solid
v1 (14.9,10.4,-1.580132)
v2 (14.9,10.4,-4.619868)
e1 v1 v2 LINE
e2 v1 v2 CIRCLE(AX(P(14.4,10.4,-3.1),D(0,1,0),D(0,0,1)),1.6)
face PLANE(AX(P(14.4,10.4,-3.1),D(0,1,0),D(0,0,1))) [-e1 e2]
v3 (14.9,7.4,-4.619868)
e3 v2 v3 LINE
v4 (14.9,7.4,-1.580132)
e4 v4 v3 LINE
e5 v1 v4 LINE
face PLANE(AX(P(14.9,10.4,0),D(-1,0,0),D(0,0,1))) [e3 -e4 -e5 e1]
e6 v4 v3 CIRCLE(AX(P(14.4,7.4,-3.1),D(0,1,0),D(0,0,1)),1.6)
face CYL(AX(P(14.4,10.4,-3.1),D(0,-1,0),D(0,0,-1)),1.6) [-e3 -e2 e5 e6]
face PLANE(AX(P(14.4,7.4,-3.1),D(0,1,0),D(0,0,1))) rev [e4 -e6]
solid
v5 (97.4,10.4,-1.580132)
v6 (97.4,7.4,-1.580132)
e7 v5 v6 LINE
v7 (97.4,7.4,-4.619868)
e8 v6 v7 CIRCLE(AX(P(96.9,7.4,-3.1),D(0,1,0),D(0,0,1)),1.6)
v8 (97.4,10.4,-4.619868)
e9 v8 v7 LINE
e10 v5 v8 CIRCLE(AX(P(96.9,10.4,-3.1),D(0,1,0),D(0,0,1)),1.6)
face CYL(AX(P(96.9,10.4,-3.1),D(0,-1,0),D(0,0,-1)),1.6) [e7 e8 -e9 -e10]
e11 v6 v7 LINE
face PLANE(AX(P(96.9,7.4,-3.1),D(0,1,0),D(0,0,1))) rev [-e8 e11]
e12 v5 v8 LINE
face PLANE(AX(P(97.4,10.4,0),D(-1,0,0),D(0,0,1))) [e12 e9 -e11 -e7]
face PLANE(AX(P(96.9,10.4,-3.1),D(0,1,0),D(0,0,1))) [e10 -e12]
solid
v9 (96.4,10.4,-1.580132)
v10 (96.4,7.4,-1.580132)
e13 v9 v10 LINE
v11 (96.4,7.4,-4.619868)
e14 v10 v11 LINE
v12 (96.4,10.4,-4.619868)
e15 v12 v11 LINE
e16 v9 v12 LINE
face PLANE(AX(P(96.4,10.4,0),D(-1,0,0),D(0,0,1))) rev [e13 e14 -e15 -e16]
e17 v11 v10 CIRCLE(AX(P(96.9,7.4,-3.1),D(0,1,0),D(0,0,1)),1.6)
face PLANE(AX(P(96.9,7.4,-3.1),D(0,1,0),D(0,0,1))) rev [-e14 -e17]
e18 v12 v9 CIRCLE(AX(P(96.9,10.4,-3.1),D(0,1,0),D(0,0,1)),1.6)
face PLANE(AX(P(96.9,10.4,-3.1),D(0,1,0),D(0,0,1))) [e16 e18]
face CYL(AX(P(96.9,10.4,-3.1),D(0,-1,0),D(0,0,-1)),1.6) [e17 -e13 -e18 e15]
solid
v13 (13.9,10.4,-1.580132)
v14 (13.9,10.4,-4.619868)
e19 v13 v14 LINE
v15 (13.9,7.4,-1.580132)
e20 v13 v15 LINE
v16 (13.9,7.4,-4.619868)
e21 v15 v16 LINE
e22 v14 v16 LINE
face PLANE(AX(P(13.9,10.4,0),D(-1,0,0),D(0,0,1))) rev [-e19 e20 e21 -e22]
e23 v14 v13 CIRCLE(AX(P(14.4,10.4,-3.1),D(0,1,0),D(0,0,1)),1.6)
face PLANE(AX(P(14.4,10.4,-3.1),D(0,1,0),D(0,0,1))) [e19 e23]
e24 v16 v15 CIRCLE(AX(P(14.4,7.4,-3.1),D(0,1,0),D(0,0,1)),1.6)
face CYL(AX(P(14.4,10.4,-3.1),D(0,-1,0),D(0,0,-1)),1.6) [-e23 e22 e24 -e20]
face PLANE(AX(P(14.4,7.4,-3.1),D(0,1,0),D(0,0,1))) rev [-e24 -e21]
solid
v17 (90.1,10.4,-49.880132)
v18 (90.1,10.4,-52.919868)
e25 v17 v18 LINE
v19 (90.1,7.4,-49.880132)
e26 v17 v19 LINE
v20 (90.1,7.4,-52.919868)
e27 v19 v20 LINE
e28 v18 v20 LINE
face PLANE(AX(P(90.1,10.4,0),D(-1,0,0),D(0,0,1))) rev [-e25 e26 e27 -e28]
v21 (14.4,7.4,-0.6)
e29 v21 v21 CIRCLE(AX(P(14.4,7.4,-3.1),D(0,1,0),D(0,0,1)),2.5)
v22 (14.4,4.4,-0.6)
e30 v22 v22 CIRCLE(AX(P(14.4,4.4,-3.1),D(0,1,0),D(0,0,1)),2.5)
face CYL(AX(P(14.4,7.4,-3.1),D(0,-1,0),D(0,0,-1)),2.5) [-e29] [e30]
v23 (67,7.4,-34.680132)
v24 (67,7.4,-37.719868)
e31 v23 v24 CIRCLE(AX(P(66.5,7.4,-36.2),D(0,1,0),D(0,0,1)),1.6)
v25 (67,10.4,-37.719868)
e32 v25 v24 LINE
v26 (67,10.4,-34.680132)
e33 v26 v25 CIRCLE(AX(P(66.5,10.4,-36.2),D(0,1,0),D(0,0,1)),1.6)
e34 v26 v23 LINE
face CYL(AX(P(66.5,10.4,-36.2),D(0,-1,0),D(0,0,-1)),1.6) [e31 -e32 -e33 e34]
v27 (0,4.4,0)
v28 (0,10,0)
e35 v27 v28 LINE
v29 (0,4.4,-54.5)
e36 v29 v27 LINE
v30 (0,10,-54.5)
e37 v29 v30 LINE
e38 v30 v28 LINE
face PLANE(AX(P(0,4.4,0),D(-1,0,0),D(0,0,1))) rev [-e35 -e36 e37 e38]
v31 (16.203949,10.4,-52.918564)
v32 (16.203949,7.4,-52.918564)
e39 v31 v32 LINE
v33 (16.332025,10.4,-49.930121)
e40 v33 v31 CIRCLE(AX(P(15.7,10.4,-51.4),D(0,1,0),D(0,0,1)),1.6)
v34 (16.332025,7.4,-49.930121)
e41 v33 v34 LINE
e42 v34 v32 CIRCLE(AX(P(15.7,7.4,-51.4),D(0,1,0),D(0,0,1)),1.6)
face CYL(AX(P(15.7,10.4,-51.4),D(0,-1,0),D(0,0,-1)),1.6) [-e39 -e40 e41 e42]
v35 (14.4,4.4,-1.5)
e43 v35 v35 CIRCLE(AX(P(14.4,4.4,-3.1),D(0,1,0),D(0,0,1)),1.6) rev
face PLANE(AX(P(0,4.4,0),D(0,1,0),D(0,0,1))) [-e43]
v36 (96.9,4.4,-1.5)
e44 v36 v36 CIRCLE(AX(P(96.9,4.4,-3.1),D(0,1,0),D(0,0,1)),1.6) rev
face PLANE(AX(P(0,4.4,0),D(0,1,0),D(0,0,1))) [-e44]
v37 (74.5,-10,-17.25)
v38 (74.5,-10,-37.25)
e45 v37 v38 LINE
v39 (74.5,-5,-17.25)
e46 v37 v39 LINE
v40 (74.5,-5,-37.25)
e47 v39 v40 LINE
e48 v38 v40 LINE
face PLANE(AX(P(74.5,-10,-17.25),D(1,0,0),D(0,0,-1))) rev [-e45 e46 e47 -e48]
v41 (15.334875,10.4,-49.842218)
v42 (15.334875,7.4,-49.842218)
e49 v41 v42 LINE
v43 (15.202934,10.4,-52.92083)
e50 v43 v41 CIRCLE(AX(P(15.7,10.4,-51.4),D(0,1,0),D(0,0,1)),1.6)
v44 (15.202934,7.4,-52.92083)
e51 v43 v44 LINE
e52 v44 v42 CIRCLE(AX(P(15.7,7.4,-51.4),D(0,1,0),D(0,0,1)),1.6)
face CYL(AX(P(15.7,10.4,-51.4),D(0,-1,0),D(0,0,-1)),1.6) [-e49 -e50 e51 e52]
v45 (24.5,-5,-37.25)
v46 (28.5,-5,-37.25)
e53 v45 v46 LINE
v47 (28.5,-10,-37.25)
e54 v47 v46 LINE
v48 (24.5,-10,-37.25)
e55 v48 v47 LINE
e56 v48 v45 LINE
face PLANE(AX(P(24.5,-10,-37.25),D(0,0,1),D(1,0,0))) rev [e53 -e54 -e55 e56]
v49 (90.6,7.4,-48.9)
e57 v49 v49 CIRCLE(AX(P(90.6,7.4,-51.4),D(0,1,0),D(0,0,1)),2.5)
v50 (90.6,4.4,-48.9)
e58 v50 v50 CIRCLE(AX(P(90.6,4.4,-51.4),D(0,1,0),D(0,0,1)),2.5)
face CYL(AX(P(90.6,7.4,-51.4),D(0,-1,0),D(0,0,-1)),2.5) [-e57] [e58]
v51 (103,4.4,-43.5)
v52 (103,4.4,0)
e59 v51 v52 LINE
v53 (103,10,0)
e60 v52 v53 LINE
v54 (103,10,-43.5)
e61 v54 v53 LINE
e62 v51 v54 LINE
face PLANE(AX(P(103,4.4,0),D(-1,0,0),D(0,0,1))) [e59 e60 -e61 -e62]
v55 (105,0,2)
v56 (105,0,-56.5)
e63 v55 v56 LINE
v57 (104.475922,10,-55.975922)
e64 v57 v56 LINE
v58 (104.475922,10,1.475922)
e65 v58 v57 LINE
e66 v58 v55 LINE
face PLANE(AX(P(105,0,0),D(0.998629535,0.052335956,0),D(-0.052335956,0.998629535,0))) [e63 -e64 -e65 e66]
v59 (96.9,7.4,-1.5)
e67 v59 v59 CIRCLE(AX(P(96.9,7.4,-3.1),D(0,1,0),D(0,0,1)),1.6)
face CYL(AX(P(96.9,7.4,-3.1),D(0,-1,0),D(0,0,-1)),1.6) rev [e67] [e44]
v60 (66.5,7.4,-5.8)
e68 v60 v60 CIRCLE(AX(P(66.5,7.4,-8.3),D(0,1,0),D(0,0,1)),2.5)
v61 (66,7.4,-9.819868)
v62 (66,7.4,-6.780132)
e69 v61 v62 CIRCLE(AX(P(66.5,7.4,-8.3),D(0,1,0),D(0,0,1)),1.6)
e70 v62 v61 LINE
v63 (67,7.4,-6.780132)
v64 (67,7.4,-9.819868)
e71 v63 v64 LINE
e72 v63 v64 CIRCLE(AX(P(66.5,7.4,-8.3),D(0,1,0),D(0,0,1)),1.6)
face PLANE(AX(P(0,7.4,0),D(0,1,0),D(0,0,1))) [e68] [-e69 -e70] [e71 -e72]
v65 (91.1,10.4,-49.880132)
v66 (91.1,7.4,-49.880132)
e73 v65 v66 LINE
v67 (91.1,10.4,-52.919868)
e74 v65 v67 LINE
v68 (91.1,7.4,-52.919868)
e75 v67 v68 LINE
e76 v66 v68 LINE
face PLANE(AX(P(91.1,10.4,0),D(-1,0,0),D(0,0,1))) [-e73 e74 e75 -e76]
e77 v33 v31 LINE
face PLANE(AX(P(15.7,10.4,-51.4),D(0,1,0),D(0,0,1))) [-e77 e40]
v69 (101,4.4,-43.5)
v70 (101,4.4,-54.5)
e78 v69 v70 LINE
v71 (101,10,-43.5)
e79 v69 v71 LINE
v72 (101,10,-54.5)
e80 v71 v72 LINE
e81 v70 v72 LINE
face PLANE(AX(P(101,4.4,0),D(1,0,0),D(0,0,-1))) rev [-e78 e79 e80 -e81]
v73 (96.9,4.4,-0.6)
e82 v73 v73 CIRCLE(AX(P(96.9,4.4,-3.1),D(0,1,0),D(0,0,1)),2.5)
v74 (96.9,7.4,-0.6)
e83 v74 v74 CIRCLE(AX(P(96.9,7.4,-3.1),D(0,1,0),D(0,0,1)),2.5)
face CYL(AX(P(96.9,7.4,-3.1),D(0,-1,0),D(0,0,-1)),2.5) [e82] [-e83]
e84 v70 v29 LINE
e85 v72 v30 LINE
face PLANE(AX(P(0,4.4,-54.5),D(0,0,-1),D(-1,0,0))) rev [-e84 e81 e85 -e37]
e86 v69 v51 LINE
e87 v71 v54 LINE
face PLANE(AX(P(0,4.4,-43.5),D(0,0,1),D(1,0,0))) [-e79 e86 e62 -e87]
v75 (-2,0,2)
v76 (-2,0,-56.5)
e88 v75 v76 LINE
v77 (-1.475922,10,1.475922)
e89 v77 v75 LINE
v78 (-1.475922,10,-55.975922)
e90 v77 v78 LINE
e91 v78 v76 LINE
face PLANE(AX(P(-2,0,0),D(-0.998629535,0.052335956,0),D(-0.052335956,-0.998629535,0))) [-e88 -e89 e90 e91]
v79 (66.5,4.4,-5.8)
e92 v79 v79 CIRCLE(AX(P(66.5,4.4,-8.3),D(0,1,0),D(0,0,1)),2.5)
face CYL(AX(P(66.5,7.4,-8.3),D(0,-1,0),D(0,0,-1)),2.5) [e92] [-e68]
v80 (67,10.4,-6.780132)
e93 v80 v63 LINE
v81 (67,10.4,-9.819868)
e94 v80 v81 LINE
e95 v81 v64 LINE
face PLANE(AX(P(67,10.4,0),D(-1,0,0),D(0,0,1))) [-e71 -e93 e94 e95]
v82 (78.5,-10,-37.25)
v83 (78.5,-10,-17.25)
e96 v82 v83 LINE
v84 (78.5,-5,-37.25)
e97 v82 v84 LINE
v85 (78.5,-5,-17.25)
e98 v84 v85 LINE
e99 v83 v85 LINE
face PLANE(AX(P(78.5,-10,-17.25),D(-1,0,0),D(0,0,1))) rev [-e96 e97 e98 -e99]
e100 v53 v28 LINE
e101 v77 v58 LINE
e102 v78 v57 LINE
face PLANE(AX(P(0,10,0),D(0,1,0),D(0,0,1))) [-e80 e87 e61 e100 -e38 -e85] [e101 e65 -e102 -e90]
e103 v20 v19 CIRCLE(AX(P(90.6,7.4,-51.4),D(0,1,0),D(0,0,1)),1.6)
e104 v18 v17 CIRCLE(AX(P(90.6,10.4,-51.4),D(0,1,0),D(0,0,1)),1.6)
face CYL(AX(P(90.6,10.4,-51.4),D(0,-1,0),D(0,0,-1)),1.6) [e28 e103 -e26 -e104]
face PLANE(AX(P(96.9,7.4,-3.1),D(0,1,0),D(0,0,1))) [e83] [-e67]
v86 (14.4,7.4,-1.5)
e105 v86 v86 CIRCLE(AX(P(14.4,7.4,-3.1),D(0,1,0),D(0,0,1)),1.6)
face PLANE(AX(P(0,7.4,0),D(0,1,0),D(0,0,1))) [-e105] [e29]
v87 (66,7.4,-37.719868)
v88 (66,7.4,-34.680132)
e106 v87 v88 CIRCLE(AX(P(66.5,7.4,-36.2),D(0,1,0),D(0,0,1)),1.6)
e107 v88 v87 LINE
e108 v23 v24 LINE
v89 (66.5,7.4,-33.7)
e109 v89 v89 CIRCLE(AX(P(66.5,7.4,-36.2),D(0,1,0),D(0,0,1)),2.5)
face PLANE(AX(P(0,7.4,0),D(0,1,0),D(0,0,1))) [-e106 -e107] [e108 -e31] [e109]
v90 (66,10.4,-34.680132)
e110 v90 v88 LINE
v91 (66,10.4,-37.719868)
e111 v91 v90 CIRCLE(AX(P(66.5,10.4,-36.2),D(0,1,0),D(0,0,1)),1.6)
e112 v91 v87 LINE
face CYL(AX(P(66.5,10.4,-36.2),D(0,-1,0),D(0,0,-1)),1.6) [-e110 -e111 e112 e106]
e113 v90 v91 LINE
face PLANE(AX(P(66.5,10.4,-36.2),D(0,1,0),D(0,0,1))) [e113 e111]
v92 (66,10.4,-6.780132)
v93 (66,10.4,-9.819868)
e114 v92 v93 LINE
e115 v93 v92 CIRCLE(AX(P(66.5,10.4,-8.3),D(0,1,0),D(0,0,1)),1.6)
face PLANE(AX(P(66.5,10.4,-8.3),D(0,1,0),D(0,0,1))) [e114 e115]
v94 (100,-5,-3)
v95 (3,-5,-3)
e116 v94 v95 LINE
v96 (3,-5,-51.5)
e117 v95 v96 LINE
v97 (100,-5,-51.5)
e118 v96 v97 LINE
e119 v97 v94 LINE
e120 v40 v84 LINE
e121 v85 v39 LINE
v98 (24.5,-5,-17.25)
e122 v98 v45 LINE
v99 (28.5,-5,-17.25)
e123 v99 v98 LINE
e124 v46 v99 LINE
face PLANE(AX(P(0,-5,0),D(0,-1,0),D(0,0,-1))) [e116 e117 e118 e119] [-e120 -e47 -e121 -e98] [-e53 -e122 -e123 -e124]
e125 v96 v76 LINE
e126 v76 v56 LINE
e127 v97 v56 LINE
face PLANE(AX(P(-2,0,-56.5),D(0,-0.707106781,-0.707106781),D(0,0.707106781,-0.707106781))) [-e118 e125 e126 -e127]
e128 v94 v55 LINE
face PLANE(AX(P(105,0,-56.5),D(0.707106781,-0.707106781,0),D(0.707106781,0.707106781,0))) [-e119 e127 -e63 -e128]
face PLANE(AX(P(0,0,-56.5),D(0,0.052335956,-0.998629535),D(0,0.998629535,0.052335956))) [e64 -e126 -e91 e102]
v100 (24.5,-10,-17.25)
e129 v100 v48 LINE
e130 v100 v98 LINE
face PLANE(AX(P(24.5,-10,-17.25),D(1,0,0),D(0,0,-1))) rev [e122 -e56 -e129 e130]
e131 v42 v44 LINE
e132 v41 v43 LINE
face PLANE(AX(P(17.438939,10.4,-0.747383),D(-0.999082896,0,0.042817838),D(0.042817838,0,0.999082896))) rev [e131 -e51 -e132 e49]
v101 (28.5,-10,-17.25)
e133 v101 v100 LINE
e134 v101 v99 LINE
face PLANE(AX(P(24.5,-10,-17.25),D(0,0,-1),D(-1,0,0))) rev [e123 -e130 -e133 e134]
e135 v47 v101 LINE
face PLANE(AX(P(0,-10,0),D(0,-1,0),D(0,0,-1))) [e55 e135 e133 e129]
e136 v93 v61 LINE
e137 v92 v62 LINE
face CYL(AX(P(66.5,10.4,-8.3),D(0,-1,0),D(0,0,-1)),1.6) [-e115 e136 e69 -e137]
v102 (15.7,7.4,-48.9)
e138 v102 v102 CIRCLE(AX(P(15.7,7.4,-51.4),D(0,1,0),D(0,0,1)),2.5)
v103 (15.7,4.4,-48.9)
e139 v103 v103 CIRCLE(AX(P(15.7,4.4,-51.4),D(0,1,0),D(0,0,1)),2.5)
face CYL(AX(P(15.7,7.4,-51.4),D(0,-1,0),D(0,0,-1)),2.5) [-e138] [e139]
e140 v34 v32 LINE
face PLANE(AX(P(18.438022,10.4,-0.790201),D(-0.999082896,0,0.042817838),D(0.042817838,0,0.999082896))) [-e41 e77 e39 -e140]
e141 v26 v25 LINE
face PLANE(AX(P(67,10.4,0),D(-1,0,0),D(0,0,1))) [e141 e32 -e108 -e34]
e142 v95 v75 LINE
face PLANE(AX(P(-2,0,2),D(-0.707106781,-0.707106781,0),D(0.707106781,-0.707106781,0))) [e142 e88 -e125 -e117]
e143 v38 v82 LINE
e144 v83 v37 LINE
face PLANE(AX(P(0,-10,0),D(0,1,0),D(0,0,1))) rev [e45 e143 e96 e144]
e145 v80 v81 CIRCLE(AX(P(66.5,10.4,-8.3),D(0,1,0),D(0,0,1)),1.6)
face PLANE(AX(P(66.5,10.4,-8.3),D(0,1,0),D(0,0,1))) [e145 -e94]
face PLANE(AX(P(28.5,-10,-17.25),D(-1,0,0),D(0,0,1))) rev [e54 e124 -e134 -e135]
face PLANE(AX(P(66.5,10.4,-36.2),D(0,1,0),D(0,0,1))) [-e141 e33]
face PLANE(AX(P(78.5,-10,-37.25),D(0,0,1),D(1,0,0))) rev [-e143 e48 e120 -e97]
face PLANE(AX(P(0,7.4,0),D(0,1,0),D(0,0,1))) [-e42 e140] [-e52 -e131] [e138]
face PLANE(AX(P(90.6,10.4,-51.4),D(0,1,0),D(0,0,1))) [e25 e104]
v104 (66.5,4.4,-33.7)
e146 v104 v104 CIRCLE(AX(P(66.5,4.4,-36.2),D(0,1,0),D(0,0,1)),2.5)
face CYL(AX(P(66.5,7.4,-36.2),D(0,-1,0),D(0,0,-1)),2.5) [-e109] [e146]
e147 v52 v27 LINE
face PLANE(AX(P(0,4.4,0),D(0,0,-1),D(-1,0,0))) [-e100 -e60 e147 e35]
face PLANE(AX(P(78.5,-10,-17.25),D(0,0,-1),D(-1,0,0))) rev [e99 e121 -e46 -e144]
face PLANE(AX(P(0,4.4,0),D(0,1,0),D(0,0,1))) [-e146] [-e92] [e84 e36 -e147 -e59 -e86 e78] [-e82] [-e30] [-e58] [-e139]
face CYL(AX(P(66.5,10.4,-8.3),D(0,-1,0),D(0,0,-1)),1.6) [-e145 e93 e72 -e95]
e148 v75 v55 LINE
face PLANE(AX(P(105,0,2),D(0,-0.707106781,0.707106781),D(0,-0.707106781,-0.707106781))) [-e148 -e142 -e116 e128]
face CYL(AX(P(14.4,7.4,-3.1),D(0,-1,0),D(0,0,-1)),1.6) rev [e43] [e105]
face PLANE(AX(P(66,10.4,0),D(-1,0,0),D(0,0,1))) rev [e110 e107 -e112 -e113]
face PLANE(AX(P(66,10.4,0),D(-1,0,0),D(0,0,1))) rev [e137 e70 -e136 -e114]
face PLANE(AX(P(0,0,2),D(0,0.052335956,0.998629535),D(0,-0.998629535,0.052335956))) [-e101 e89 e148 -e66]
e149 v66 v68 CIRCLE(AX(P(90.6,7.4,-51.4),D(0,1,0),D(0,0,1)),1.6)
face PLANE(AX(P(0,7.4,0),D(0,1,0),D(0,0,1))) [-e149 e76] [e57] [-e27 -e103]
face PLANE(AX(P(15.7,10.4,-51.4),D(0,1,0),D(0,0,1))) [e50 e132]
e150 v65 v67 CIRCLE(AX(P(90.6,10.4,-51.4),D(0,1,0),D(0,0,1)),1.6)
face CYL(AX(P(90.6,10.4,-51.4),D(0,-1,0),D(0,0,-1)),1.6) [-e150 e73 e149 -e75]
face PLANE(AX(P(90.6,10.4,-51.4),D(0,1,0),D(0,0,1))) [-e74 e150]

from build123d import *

# Parameters (mm, degrees)
SKETCH2_W           = 107
SKETCH2_H           = 58.5
BOSS_EXTRUDE1_DEPTH = 10
BOSS_EXTRUDE1_TAPER = 3
CUT_EXTRUDE1_START  = 10
SKETCH2_5_W         = 2
SKETCH2_5_H         = 1
CUT_EXTRUDE1_DEPTH  = 5.6
SKETCH8_W           = 107
SKETCH8_H           = 58.5
BOSS_EXTRUDE2_DEPTH = 5
BOSS_EXTRUDE2_TAPER = 45
SKETCH9_W           = 4
SKETCH9_H           = 20
BOSS_EXTRUDE3_DEPTH = 5
SKETCH10_R          = 2.5
BOSS_EXTRUDE4_DEPTH = 3
BOSS_EXTRUDE5_START = 7.4
BOSS_EXTRUDE5_DEPTH = 3


# Read off the part's stored shape, not the designer's step: Boss-Extrude5
with BuildPart() as part:
    # Sketch2 → Boss-Extrude1 (new body)
    with BuildSketch(Plane(origin=(0, 0, 0), x_dir=(1, 0, 0), z_dir=(0, 1, 0))):
        with Locations((51.5, 27.25)):
            Rectangle(SKETCH2_W, SKETCH2_H)
    extrude(amount=BOSS_EXTRUDE1_DEPTH, taper=BOSS_EXTRUDE1_TAPER)

    # Sketch2<5> → Cut-Extrude1 (cut)
    with BuildSketch(Plane(origin=(0, 0, 0), x_dir=(1, 0, 0), z_dir=(0, 1, 0)).offset(CUT_EXTRUDE1_START)):
        Polygon((0, 0), (101, 0), (101, 1), (103, 3), (103, 41.5), (101, 43.5), (101, 54.5), (0, 54.5), align=None)
        Polygon((103, 43.5), (101, 43.5), (103, 41.5), align=None)
        Polygon((103, 3), (101, 1), (103, 1), align=None)
        with Locations((102, 0.5)):
            Rectangle(SKETCH2_5_W, SKETCH2_5_H)
    extrude(amount=-CUT_EXTRUDE1_DEPTH, mode=Mode.SUBTRACT)

    # Sketch8 → Boss-Extrude2 (add)
    with BuildSketch(Plane.XZ):
        with Locations((51.5, -27.25)):
            Rectangle(SKETCH8_W, SKETCH8_H)
    extrude(amount=BOSS_EXTRUDE2_DEPTH, taper=BOSS_EXTRUDE2_TAPER)

    # Sketch9 → Boss-Extrude3 (add)
    with BuildSketch(Plane.XZ.offset(5)):
        with Locations((26.5, -27.25)):
            Rectangle(SKETCH9_W, SKETCH9_H)
        with Locations((76.5, -27.25)):
            Rectangle(SKETCH9_W, SKETCH9_H)
    extrude(amount=BOSS_EXTRUDE3_DEPTH)

    # Sketch10 → Boss-Extrude4 (add)
    # profile 1 of 6: a face of its own
    with BuildSketch(Plane(origin=(0, 4.4, 0), x_dir=(1, 0, 0), z_dir=(0, 1, 0))):
        with Locations(Location((15.7, 51.4, 0), (0, 0, 270))):
            Circle(SKETCH10_R)
    # profile 2 of 6: a face of its own
    with BuildSketch(Plane(origin=(0, 4.4, 0), x_dir=(1, 0, 0), z_dir=(0, 1, 0))):
        with Locations(Location((90.6, 51.4, 0), (0, 0, 270))):
            Circle(SKETCH10_R)
    # profile 3 of 6: a face of its own
    with BuildSketch(Plane(origin=(0, 4.4, 0), x_dir=(1, 0, 0), z_dir=(0, 1, 0))):
        with Locations(Location((66.5, 8.3, 0), (0, 0, 270))):
            Circle(SKETCH10_R)
    # profile 4 of 6: a face of its own
    with BuildSketch(Plane(origin=(0, 4.4, 0), x_dir=(1, 0, 0), z_dir=(0, 1, 0))):
        with Locations(Location((66.5, 36.2, 0), (0, 0, 270))):
            Circle(SKETCH10_R)
    # profile 5 of 6: a face of its own
    with BuildSketch(Plane(origin=(0, 4.4, 0), x_dir=(1, 0, 0), z_dir=(0, 1, 0))):
        with Locations(Location((96.9, 3.1, 0), (0, 0, 270))):
            Circle(SKETCH10_R)
        with BuildLine():
            ThreePointArc((96.4, 4.619868415), (96.9, 4.7), (97.4, 4.619868415))
            ThreePointArc((97.4, 4.619868415), (96.9, 1.5), (96.4, 4.619868415))
        make_face(mode=Mode.SUBTRACT)
    # profile 6 of 6: a face of its own
    with BuildSketch(Plane(origin=(0, 4.4, 0), x_dir=(1, 0, 0), z_dir=(0, 1, 0))):
        with Locations(Location((14.4, 3.1, 0), (0, 0, 270))):
            Circle(SKETCH10_R)
        with BuildLine():
            ThreePointArc((13.9, 1.580131585), (12.8, 3.1), (13.9, 4.619868415))
            ThreePointArc((13.9, 4.619868415), (14.4, 4.7), (14.9, 4.619868415))
            ThreePointArc((14.9, 4.619868415), (16, 3.1), (14.9, 1.580131585))
            ThreePointArc((14.9, 1.580131585), (14.4, 1.5), (13.9, 1.580131585))
        make_face(mode=Mode.SUBTRACT)
    extrude(amount=BOSS_EXTRUDE4_DEPTH)

    # Boss-Extrude5 outline → Boss-Extrude5 (add)
    with BuildSketch(Plane(origin=(0, 0, 0), x_dir=(1, 0, 0), z_dir=(0, 1, 0)).offset(BOSS_EXTRUDE5_START)):
        with BuildLine():
            ThreePointArc((96.4, 4.619868415), (95.3, 3.1), (96.4, 1.580131585))
            Line((96.4, 1.580131585), (96.4, 4.619868415))
        make_face()
        with BuildLine():
            ThreePointArc((97.4, 1.580131585), (98.5, 3.1), (97.4, 4.619868415))
            Line((97.4, 4.619868415), (97.4, 1.580131585))
        make_face()
        with BuildLine():
            ThreePointArc((13.9, 4.619868415), (12.8, 3.1), (13.9, 1.580131585))
            Line((13.9, 1.580131585), (13.9, 4.619868415))
        make_face()
        with BuildLine():
            ThreePointArc((14.9, 1.580131585), (16, 3.1), (14.9, 4.619868415))
            Line((14.9, 4.619868415), (14.9, 1.580131585))
        make_face()
        with BuildLine():
            ThreePointArc((16.332025214, 49.930121049), (17.298532633, 51.468508541), (16.203949106, 52.918563564))
            Line((16.203949106, 52.918563564), (16.332025214, 49.930121049))
        make_face()
        with BuildLine():
            ThreePointArc((15.202934006, 52.920830496), (14.101467367, 51.331491459), (15.334874522, 49.842218441))
            Line((15.334874522, 49.842218441), (15.202934006, 52.920830496))
        make_face()
        with BuildLine():
            ThreePointArc((91.1, 49.880131585), (92.2, 51.4), (91.1, 52.919868415))
            Line((91.1, 52.919868415), (91.1, 49.880131585))
        make_face()
        with BuildLine():
            ThreePointArc((90.1, 52.919868415), (89, 51.4), (90.1, 49.880131585))
            Line((90.1, 49.880131585), (90.1, 52.919868415))
        make_face()
        with BuildLine():
            ThreePointArc((67, 34.680131585), (68.1, 36.2), (67, 37.719868415))
            Line((67, 37.719868415), (67, 34.680131585))
        make_face()
        with BuildLine():
            ThreePointArc((66, 37.719868415), (64.9, 36.2), (66, 34.680131585))
            Line((66, 34.680131585), (66, 37.719868415))
        make_face()
        with BuildLine():
            ThreePointArc((67, 6.780131585), (68.1, 8.3), (67, 9.819868415))
            Line((67, 9.819868415), (67, 6.780131585))
        make_face()
        with BuildLine():
            Line((66, 6.780131585), (66, 9.819868415))
            ThreePointArc((66, 9.819868415), (64.9, 8.3), (66, 6.780131585))
        make_face()
    extrude(amount=BOSS_EXTRUDE5_DEPTH)


solid = part.part
